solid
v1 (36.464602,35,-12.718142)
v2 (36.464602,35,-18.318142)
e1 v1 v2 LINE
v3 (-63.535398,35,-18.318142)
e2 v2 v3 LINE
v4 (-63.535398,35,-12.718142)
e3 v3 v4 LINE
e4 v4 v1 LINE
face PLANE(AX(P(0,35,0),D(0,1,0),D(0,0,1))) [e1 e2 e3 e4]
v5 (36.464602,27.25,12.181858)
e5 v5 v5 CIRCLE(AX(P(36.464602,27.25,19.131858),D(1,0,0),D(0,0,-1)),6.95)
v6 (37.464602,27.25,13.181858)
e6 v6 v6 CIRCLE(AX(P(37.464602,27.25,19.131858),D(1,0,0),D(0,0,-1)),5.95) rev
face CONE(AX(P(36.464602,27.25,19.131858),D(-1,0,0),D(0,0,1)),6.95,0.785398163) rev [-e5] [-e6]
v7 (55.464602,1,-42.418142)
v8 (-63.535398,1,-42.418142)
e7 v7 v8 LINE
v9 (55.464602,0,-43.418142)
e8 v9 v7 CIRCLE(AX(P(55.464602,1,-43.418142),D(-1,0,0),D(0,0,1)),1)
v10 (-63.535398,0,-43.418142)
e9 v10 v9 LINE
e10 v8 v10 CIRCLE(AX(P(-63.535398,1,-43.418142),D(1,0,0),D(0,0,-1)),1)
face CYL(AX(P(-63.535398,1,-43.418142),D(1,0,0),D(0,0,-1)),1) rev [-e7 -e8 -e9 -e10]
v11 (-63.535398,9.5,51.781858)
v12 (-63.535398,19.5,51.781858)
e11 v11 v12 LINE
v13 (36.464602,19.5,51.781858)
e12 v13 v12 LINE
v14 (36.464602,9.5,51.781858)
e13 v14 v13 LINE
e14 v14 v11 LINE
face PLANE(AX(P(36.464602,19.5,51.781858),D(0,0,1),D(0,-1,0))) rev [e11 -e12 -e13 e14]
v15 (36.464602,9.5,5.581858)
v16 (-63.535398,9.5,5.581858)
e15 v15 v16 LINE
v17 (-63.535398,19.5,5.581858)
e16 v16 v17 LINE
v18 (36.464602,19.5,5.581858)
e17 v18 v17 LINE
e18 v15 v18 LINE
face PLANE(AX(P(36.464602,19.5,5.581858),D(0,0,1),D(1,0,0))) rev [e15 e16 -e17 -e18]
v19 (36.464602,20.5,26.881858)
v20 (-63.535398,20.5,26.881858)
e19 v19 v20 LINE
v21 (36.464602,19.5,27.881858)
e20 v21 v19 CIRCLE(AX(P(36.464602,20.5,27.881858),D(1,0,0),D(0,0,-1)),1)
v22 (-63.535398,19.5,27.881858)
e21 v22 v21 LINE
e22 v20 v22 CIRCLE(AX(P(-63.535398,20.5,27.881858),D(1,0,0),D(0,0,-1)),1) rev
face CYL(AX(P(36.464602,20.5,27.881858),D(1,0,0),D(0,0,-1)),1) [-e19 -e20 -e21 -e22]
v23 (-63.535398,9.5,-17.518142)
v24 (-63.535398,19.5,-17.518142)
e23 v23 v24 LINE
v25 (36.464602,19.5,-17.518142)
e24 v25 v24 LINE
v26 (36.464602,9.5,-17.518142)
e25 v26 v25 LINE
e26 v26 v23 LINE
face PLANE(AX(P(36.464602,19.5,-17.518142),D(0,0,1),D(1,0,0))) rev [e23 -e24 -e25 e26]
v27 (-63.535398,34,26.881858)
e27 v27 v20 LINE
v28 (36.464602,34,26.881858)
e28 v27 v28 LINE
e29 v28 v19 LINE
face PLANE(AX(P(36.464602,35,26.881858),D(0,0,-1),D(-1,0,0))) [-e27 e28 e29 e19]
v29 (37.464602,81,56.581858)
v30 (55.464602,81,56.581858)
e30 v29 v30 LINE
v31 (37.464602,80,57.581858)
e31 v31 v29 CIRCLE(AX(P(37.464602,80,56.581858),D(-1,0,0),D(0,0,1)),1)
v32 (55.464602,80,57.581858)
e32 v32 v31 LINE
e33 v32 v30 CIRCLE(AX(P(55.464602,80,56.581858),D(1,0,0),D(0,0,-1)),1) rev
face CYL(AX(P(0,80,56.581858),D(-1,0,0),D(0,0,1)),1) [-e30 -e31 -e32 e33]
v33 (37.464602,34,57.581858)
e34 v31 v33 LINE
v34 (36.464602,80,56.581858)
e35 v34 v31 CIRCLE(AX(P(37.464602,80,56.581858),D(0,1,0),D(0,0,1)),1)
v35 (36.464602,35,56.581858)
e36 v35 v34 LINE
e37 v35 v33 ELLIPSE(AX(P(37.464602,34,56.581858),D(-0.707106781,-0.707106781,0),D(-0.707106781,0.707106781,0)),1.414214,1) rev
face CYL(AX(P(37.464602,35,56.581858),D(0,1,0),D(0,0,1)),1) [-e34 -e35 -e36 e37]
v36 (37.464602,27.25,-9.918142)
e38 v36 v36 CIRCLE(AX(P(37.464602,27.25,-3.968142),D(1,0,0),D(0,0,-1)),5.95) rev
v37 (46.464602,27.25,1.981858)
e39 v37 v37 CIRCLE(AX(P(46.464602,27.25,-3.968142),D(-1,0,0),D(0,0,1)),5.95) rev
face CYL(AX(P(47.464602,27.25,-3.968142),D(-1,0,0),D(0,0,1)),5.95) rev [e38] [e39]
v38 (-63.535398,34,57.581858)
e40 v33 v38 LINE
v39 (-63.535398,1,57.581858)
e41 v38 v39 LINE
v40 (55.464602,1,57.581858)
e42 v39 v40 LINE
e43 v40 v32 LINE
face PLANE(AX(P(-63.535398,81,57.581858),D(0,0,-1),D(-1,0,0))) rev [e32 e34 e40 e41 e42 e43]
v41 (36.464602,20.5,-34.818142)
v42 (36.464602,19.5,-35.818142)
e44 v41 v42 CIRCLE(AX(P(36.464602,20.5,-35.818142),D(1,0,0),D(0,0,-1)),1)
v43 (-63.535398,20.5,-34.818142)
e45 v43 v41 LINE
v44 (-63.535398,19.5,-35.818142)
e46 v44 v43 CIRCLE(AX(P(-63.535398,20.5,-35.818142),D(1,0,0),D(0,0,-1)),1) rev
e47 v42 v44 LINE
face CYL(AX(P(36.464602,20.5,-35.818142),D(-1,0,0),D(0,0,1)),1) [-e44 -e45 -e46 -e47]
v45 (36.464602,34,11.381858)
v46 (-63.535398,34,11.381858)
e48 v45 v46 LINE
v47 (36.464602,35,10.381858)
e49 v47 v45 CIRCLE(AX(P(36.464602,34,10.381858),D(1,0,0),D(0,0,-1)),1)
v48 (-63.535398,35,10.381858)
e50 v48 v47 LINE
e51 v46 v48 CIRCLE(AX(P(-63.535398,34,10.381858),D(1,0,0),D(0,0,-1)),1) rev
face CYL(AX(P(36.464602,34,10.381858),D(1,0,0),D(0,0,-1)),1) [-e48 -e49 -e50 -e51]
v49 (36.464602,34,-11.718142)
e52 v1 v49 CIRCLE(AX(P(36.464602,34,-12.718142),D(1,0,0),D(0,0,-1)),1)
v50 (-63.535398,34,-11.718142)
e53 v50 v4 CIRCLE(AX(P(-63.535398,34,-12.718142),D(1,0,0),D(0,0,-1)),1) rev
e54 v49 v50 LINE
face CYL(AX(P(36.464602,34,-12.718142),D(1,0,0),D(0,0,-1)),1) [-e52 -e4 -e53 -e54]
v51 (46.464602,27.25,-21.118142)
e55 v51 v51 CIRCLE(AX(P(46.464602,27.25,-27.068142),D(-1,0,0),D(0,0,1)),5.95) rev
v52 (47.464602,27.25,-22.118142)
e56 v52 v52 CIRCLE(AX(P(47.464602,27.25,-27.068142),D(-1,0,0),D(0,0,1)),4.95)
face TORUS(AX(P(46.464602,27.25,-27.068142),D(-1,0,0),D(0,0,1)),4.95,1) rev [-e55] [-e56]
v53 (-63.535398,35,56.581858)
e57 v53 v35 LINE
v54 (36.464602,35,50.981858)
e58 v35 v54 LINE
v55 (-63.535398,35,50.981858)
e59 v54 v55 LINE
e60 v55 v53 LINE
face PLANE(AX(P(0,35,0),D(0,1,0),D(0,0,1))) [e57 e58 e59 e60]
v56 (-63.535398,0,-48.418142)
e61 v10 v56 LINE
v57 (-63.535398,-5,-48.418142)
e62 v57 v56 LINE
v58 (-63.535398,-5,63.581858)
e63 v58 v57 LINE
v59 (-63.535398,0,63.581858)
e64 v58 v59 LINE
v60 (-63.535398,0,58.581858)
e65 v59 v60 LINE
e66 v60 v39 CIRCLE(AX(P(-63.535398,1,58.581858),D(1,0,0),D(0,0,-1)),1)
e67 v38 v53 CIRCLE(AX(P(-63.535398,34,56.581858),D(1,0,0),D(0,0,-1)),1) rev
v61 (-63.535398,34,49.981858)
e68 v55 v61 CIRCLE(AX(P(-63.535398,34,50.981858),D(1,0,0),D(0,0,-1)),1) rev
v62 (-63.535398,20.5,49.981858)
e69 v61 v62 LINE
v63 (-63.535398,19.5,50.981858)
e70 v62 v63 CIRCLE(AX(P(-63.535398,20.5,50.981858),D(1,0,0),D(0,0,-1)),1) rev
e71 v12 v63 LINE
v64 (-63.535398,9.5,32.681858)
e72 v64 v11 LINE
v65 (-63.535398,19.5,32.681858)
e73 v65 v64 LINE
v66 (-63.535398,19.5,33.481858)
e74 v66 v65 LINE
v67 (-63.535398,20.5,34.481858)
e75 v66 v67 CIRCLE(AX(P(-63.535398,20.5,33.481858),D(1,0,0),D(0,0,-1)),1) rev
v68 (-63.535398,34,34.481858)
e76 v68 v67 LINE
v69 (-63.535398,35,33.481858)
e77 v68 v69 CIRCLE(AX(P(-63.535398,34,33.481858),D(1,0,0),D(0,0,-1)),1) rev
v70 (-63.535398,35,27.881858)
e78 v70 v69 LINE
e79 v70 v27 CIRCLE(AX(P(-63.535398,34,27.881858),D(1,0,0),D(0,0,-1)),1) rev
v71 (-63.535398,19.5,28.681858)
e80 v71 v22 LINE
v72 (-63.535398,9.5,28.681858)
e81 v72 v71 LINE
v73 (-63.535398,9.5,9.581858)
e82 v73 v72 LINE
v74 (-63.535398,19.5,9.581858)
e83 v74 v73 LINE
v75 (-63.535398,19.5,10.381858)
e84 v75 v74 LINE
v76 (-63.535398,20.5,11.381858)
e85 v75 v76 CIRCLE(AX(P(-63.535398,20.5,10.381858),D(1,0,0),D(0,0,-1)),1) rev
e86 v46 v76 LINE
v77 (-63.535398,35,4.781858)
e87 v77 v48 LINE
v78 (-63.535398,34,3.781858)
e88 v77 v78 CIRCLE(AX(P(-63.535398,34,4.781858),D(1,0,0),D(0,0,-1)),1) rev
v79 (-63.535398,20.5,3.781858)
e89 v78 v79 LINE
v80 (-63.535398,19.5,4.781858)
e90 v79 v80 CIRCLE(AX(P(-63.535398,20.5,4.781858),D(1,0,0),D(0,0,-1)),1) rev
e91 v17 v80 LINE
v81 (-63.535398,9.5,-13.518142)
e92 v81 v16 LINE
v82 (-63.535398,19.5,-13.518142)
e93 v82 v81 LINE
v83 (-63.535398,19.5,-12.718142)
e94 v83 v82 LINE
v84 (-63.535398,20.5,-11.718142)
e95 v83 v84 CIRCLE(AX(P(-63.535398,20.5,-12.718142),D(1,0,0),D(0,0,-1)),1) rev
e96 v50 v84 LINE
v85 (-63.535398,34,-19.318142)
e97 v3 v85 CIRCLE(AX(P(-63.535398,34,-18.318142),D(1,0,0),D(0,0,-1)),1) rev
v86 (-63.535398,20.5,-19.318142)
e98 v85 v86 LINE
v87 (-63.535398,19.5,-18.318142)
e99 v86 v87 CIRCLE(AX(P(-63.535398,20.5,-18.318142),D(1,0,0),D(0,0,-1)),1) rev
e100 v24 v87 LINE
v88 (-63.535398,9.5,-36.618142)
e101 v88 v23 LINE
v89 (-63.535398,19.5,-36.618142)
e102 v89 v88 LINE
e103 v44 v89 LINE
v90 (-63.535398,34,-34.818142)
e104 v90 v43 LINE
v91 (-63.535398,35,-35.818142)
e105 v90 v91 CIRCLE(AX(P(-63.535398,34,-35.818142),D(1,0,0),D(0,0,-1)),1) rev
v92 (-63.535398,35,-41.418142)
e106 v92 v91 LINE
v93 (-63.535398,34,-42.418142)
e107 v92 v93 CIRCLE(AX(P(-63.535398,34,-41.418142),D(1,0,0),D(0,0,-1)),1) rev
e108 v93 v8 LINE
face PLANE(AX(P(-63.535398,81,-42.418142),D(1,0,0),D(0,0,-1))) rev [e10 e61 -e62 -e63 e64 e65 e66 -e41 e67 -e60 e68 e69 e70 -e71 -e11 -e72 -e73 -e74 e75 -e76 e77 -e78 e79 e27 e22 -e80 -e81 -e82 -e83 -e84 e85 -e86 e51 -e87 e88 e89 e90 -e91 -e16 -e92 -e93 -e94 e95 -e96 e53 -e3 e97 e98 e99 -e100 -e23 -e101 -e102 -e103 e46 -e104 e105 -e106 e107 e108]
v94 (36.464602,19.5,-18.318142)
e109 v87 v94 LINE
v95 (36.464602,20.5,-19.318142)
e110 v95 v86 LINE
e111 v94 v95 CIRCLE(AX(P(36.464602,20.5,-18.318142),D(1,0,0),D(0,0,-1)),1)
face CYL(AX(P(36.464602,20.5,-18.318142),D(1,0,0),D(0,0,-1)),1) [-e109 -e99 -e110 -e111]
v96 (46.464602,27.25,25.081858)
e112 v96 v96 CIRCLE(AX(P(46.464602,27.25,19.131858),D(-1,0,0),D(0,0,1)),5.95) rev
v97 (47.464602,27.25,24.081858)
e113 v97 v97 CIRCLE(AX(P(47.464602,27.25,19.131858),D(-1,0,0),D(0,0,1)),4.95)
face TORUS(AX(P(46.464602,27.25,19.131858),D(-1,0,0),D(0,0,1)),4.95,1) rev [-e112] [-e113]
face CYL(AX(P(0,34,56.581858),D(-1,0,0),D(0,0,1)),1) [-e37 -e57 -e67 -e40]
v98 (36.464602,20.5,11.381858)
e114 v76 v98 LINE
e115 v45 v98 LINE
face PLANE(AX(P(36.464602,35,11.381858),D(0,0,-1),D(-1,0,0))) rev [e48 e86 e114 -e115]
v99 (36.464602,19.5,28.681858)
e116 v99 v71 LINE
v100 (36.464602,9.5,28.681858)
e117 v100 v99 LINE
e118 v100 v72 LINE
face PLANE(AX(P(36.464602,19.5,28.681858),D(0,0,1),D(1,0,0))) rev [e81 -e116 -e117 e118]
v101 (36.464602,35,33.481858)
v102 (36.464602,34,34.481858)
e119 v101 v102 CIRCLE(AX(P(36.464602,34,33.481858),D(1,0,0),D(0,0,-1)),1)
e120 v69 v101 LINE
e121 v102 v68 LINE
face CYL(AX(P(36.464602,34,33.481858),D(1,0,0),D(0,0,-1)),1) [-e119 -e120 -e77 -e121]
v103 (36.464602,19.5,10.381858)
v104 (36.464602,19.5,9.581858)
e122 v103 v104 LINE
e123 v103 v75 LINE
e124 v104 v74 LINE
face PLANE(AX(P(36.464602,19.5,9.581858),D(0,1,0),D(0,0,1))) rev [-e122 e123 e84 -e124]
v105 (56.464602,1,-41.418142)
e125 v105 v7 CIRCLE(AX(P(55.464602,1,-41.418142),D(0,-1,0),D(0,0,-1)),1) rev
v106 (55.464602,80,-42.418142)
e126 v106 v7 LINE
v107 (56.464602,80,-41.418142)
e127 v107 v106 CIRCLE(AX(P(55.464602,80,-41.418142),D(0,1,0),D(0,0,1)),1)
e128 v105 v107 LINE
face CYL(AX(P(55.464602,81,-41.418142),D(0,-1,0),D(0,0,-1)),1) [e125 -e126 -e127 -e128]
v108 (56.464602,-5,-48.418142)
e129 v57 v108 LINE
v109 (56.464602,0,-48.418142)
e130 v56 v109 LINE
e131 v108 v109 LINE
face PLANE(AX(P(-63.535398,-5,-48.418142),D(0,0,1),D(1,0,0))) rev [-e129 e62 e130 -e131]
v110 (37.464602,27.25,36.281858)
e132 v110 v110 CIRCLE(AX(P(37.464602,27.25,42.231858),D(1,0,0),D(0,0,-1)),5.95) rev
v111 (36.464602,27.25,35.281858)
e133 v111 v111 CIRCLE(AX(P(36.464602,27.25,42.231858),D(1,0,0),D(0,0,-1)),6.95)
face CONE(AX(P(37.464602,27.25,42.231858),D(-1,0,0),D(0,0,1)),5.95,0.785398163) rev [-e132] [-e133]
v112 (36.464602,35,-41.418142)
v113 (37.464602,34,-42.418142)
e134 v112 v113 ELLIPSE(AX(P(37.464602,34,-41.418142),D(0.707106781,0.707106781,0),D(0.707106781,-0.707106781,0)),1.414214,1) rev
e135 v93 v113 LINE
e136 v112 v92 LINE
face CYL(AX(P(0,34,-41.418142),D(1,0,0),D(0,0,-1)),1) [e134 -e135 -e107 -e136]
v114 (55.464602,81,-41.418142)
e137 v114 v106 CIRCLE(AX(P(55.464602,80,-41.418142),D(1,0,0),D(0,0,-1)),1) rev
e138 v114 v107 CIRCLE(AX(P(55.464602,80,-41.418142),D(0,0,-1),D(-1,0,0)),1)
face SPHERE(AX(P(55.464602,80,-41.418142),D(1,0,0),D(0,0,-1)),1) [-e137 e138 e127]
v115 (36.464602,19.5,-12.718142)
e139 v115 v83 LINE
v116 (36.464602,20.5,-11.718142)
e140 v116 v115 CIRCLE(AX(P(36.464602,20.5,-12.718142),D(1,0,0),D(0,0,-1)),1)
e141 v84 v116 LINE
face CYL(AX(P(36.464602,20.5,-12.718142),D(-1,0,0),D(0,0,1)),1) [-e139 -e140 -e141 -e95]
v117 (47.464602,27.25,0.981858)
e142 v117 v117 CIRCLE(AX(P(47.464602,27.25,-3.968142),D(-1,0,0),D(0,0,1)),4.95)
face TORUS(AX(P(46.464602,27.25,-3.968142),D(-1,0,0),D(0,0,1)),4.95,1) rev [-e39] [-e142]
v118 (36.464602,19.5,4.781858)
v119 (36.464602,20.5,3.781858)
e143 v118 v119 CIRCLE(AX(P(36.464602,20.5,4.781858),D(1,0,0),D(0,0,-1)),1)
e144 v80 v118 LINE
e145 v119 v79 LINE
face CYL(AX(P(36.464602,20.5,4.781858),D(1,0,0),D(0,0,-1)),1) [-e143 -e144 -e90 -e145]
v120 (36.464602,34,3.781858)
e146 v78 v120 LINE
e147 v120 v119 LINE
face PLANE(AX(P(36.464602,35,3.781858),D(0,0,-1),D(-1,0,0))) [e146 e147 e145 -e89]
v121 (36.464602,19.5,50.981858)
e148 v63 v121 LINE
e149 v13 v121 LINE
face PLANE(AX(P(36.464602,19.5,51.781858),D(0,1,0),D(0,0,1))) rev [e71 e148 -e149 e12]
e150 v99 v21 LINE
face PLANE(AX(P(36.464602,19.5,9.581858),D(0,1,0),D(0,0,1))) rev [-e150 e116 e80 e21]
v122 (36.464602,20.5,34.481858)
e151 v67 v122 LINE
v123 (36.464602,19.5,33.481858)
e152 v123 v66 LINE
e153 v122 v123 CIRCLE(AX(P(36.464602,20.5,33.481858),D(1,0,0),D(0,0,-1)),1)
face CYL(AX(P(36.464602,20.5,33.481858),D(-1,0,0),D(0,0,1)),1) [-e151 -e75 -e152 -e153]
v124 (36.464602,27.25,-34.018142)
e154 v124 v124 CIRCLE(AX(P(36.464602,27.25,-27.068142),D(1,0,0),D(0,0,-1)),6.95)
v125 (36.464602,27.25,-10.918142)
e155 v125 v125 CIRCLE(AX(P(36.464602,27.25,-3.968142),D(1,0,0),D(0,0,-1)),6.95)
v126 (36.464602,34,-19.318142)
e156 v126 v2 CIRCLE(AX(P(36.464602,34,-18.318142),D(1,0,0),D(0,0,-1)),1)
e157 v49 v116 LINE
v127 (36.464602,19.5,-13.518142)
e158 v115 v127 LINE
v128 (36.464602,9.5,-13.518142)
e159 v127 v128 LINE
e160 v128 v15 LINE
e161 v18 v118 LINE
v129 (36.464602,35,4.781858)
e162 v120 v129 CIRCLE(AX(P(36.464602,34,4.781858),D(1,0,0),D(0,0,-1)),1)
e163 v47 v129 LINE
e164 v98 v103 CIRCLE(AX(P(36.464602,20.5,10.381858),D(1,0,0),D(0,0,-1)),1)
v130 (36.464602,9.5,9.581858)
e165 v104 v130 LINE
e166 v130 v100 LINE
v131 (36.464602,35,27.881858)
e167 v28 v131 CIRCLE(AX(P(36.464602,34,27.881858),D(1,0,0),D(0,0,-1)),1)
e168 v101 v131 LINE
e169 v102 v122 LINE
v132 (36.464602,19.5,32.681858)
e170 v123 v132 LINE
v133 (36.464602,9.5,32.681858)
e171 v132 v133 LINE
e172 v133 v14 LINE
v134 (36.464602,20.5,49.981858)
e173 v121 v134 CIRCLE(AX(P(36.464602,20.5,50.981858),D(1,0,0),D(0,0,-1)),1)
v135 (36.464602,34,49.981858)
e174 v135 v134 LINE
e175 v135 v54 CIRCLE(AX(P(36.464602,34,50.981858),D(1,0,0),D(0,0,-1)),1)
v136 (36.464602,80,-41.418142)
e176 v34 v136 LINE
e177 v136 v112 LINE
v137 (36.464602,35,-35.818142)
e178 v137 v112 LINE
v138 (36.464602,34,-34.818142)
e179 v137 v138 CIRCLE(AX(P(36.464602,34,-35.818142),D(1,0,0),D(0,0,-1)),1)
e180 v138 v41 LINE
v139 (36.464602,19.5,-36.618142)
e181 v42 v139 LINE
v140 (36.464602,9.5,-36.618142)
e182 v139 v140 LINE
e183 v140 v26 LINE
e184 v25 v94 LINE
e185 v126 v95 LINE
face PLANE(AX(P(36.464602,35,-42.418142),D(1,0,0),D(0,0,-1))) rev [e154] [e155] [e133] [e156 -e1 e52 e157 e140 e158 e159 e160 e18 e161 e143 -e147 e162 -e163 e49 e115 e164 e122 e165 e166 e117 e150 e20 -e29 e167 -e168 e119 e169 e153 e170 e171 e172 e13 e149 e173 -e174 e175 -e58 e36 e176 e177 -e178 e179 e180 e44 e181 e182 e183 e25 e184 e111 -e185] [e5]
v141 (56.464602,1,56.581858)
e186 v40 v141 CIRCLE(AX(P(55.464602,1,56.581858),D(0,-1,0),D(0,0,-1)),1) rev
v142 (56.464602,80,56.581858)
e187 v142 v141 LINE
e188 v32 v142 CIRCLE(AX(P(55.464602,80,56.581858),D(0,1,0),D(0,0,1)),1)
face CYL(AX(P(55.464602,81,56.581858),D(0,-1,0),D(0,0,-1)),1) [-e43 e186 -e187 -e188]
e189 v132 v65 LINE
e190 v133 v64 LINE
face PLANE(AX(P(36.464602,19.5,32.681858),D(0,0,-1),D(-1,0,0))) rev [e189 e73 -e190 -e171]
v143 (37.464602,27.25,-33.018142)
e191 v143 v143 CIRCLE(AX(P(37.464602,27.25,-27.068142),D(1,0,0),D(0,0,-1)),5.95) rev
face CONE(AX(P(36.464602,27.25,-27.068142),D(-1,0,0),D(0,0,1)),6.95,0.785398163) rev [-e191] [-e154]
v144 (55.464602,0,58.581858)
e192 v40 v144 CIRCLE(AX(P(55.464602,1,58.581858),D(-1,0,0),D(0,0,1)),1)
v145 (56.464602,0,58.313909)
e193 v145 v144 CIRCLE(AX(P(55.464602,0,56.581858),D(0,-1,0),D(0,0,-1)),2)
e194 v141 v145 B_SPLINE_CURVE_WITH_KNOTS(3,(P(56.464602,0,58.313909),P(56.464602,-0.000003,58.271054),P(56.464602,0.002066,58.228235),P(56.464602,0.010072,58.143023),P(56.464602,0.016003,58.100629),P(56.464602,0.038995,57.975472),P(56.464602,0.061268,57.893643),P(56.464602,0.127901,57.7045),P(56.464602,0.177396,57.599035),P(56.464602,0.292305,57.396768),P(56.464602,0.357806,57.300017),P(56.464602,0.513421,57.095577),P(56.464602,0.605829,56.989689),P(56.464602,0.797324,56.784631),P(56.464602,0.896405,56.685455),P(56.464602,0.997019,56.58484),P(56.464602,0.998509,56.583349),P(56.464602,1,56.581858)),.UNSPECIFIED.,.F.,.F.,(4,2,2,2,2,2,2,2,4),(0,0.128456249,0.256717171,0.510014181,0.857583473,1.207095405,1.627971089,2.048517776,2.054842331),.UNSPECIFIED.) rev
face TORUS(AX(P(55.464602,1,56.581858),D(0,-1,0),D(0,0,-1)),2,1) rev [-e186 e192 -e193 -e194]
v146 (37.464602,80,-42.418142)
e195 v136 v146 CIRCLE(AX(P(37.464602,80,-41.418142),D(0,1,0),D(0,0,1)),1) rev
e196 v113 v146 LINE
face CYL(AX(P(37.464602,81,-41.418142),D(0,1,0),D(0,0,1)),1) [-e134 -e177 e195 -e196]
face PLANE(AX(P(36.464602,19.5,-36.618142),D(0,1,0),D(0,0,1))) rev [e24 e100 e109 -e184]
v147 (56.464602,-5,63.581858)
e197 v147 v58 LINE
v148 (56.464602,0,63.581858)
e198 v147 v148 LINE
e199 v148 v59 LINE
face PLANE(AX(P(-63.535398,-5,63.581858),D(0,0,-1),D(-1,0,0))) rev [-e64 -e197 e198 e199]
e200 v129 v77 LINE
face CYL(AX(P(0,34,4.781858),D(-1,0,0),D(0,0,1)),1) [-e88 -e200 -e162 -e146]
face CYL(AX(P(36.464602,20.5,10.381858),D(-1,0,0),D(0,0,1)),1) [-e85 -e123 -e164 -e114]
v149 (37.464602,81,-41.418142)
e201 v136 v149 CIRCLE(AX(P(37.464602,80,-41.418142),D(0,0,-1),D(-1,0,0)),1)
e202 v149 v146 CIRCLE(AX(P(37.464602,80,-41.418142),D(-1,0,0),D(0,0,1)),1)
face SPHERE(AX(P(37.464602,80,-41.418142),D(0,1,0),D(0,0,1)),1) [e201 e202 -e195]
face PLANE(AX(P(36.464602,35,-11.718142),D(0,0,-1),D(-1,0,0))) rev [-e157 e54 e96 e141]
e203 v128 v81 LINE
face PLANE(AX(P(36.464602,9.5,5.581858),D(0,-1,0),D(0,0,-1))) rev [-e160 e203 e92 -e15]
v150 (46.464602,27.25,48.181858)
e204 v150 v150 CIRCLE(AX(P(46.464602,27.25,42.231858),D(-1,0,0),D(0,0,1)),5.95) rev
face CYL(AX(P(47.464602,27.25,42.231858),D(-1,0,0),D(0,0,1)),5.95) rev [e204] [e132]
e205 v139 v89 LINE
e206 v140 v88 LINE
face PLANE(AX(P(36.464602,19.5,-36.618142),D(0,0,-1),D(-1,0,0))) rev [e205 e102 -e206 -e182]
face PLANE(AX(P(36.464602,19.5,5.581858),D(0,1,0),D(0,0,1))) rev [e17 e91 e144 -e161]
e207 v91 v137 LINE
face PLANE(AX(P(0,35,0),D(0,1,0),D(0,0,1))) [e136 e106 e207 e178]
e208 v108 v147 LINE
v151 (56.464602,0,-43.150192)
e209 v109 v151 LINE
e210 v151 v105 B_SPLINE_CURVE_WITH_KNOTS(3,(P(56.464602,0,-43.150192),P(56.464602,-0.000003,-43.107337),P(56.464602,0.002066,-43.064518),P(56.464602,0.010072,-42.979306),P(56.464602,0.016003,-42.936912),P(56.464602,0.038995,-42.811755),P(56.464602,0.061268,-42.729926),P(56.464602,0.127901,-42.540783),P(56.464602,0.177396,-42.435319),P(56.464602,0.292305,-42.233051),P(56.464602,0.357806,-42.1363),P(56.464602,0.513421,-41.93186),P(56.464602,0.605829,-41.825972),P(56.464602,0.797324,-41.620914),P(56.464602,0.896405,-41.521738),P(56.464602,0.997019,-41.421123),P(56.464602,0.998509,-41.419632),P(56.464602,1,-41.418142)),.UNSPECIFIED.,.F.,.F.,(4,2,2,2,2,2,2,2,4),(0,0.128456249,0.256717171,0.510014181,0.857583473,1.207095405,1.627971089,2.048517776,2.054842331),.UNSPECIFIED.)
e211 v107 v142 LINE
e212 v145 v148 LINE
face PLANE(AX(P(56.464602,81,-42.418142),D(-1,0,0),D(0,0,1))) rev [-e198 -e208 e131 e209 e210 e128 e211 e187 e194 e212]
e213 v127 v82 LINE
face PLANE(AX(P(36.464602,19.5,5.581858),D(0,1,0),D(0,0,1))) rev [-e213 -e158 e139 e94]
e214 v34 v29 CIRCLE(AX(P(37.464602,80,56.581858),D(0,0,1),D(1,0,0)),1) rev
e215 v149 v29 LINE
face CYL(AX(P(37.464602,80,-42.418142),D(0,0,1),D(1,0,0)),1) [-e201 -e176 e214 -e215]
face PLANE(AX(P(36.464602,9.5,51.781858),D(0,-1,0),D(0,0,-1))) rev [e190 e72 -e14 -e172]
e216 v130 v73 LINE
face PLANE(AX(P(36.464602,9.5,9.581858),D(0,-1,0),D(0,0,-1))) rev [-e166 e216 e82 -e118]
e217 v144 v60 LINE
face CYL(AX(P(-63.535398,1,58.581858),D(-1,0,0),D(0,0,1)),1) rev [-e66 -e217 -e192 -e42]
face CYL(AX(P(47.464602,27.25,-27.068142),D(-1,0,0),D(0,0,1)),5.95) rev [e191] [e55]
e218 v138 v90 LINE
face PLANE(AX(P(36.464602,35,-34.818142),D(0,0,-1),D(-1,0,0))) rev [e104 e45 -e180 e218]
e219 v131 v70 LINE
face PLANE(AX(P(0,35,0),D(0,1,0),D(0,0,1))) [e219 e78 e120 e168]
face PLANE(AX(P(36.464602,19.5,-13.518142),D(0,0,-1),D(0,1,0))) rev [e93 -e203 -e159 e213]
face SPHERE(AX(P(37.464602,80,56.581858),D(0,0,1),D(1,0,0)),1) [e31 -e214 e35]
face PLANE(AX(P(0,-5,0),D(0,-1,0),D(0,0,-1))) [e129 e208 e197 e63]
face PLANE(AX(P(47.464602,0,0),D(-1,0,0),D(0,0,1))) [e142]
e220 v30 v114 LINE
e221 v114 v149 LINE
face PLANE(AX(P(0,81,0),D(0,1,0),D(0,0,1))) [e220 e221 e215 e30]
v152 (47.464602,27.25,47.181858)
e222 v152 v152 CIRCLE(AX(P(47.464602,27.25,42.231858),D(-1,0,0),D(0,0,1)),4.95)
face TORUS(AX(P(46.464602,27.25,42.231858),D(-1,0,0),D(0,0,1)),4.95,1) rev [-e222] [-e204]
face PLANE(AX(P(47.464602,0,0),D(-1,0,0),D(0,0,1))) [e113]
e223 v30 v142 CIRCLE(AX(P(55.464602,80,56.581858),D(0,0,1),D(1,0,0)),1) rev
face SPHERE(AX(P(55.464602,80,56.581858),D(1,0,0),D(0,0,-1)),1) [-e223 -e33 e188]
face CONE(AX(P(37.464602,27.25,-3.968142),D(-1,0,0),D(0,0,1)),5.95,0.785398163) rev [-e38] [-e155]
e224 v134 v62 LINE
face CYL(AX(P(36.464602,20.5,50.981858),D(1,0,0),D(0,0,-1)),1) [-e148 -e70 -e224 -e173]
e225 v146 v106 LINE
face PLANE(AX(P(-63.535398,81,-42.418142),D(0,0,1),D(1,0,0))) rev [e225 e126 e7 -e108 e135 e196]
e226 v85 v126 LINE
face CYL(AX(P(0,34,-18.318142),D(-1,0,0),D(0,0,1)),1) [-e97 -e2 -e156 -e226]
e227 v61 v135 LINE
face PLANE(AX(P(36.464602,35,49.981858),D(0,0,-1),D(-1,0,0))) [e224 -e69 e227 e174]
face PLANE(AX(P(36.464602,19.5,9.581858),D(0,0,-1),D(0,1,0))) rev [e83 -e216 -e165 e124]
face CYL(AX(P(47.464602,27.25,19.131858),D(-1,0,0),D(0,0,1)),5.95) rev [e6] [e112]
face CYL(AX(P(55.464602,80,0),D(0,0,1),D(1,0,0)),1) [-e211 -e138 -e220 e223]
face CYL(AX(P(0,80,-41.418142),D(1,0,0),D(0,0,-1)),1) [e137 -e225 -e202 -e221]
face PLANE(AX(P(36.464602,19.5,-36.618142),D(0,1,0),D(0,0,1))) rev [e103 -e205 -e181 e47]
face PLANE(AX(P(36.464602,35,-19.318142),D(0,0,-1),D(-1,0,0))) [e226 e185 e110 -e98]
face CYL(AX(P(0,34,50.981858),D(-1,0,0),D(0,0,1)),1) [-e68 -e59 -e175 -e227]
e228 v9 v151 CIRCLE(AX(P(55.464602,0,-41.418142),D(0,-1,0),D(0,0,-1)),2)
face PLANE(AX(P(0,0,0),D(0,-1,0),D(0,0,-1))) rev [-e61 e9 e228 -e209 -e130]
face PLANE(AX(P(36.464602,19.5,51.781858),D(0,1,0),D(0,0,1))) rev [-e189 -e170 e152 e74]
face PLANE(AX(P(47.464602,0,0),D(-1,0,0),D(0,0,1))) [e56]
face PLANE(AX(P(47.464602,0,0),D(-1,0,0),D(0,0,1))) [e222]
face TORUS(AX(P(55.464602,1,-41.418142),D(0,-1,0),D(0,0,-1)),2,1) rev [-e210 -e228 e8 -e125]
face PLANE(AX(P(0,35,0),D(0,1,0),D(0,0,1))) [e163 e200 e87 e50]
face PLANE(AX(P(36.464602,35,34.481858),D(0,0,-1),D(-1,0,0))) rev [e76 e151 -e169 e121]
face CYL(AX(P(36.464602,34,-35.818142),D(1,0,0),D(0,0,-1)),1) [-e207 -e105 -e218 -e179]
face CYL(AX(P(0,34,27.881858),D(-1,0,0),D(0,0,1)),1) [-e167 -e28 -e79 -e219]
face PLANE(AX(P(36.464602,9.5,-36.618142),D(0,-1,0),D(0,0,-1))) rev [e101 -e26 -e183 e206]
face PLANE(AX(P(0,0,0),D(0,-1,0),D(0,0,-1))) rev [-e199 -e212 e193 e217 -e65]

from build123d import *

# Parameters (mm, degrees)
SKETCH1_W           = 120
SKETCH1_H           = 100
BOSS_EXTRUDE1_DEPTH = 81
SKETCH2_W           = 100
SKETCH2_H           = 100
CUT_EXTRUDE1_DEPTH  = 46
SKETCH6_W           = 15.5
SKETCH6_H           = 15.5
CUT_EXTRUDE4_DEPTH  = 100
SKETCH8_W           = 19.1
SKETCH8_H           = 10
CUT_EXTRUDE5_DEPTH  = 100
SKETCH6_3_R         = 5.95
CUT_EXTRUDE6_DEPTH  = 111
FILLET1_R           = 1
CHAMFER1_SIZE       = 1
FILLET2_R           = 1
FILLET3_R           = 1
SKETCH9_W           = 120
SKETCH9_H           = 112
BOSS_EXTRUDE2_DEPTH = 5
FILLET4_R           = 1


with BuildPart() as part:
    # Sketch1 → Boss-Extrude1 (new body)
    with BuildSketch(Plane(origin=(0, 0, 0), x_dir=(1, 0, 0), z_dir=(0, 1, 0))):
        with Locations((-3.53539823, -7.581858407)):
            Rectangle(SKETCH1_W, SKETCH1_H)
    extrude(amount=BOSS_EXTRUDE1_DEPTH)

    # Sketch2 → Cut-Extrude1 (cut)
    with BuildSketch(Plane(origin=(0, 81, 0), x_dir=(1, 0, 0), z_dir=(0, 1, 0))):
        with Locations((-13.53539823, -7.581858407)):
            Rectangle(SKETCH2_W, SKETCH2_H)
    extrude(amount=-CUT_EXTRUDE1_DEPTH, mode=Mode.SUBTRACT)

    # Sketch6 → Cut-Extrude4 (cut)
    with BuildSketch(Plane.ZY.offset(63.53539823)):
        with Locations((-27.068141593, 27.25)):
            Rectangle(SKETCH6_W, SKETCH6_H)
        with Locations((-3.968141593, 27.25)):
            Rectangle(SKETCH6_W, SKETCH6_H)
        with Locations((19.131858407, 27.25)):
            Rectangle(SKETCH6_W, SKETCH6_H)
        with Locations((42.231858407, 27.25)):
            Rectangle(SKETCH6_W, SKETCH6_H)
    extrude(amount=-CUT_EXTRUDE4_DEPTH, mode=Mode.SUBTRACT)

    # Sketch8 → Cut-Extrude5 (cut)
    with BuildSketch(Plane.ZY.offset(63.53539823)):
        with Locations((-27.068141593, 14.5)):
            Rectangle(SKETCH8_W, SKETCH8_H)
        with Locations((-3.968141593, 14.5)):
            Rectangle(SKETCH8_W, SKETCH8_H)
        with Locations((42.231858407, 14.5)):
            Rectangle(SKETCH8_W, SKETCH8_H)
        with Locations((19.131858407, 14.5)):
            Rectangle(SKETCH8_W, SKETCH8_H)
    extrude(amount=-CUT_EXTRUDE5_DEPTH, mode=Mode.SUBTRACT)

    # Sketch6<3> → Cut-Extrude6 (cut)
    with BuildSketch(Plane.ZY.offset(63.53539823)):
        with Locations((-27.068141593, 27.25)):
            Circle(SKETCH6_3_R)
        with Locations((-3.968141593, 27.25)):
            Circle(SKETCH6_3_R)
        with Locations((42.231858407, 27.25)):
            Circle(SKETCH6_3_R)
        with Locations((19.131858407, 27.25)):
            Circle(SKETCH6_3_R)
    extrude(amount=-CUT_EXTRUDE6_DEPTH, mode=Mode.SUBTRACT)

    # Fillet1
    fillet1_edges = [part.edges().sort_by_distance(p)[0] for p in [
        (56.46460177, 81, 7.581858407),
        (46.46460177, 81, 57.581858407),
        (46.46460177, 81, -42.418141593),
        (-13.53539823, 35, -42.418141593),
        (36.46460177, 58, -42.418141593),
        (-13.53539823, 35, 57.581858407),
        (36.46460177, 58, 57.581858407),
        (36.46460177, 81, 7.581858407),
        (56.46460177, 40.5, -42.418141593),
        (56.46460177, 40.5, 57.581858407),
    ]]
    fillet(fillet1_edges, radius=FILLET1_R)

    # Chamfer1
    chamfer1_edges = [part.edges().sort_by_distance(p)[0] for p in [
        (36.46460177, 27.25, -33.018141593),
        (36.46460177, 27.25, -9.918141593),
        (36.46460177, 27.25, 13.181858407),
        (36.46460177, 27.25, 36.281858407),
    ]]
    chamfer(chamfer1_edges, length=CHAMFER1_SIZE)

    # Fillet2
    fillet2_edges = [part.edges().sort_by_distance(p)[0] for p in [
        (47.46460177, 27.25, -33.018141593),
        (47.46460177, 27.25, -9.918141593),
        (47.46460177, 27.25, 13.181858407),
        (47.46460177, 27.25, 36.281858407),
    ]]
    fillet(fillet2_edges, radius=FILLET2_R)

    # Fillet3
    fillet3_edges = [part.edges().sort_by_distance(p)[0] for p in [
        (-13.53539823, 19.5, -19.318141593),
        (-13.53539823, 19.5, -34.818141593),
        (-13.53539823, 35, -34.818141593),
        (-13.53539823, 35, -19.318141593),
        (-13.53539823, 19.5, 3.781858407),
        (-13.53539823, 19.5, -11.718141593),
        (-13.53539823, 35, -11.718141593),
        (-13.53539823, 35, 3.781858407),
        (-13.53539823, 19.5, 49.981858407),
        (-13.53539823, 19.5, 34.481858407),
        (-13.53539823, 35, 34.481858407),
        (-13.53539823, 35, 49.981858407),
        (-13.53539823, 19.5, 26.881858407),
        (-13.53539823, 19.5, 11.381858407),
        (-13.53539823, 35, 11.381858407),
        (-13.53539823, 35, 26.881858407),
    ]]
    fillet(fillet3_edges, radius=FILLET3_R)

    # Sketch9 → Boss-Extrude2 (add)
    with BuildSketch(Plane.XZ):
        with Locations((-3.53539823, 7.581858407)):
            Rectangle(SKETCH9_W, SKETCH9_H)
    extrude(amount=BOSS_EXTRUDE2_DEPTH)

    # Fillet4
    # the kernel refuses this fillet: 1 mm, written as the material it adds along each edge
    with BuildSketch(Plane(origin=(-63.53539823, 0, -42.418141593), x_dir=(0, 0, -1), z_dir=(1, 0, 0)), Plane(origin=(55.46460177, 0, 57.581858407), x_dir=(0, 0, 1), z_dir=(-1, 0, 0))) as fillet4_piece_1:
        with BuildLine():
            CenterArc((FILLET4_R, FILLET4_R), FILLET4_R, 180, 90)
            Line((0, FILLET4_R), (0, 0))
            Line((0, 0), (FILLET4_R, 0))
        make_face()
    extrude(amount=119)
    with BuildSketch(Plane(origin=(55.46460177, 0, -41.418141593), x_dir=(0, 0, -1), z_dir=(-1, 0, 0))) as fillet4_piece_2_section:
        with BuildLine():
            CenterArc((1 + FILLET4_R, -FILLET4_R), FILLET4_R, 90, 90)
            Line((1, -FILLET4_R), (1, 0))
            Line((1, 0), (1 + FILLET4_R, 0))
        make_face()
    fillet4_piece_2 = revolve(axis=Axis((55.46460177, 0, -41.418141593), (0, -1, 0)), revolution_arc=233.296989237, mode=Mode.PRIVATE)
    fillet4_piece_2 = split(fillet4_piece_2, bisect_by=Plane(origin=(56.46460177, 0.167300205, -42.63791684), z_dir=(-1, 0, 0)), keep=Keep.TOP, mode=Mode.PRIVATE)
    add(fillet4_piece_2)
    with BuildSketch(Plane(origin=(55.46460177, 0, 56.581858407), x_dir=(-0.8017442392976468, 0, -0.5976672776328293), z_dir=(-0.5976672776328293, 0, 0.8017442392976468))) as fillet4_piece_3_section:
        with BuildLine():
            CenterArc((1 + FILLET4_R, -FILLET4_R), FILLET4_R, 90, 90)
            Line((1, -FILLET4_R), (1, 0))
            Line((1, 0), (1 + FILLET4_R, 0))
        make_face()
    fillet4_piece_3 = revolve(axis=Axis((55.46460177, 0, 56.581858407), (0, -1, 0)), revolution_arc=233.296989237, mode=Mode.PRIVATE)
    fillet4_piece_3 = split(fillet4_piece_3, bisect_by=Plane(origin=(56.46460177, 0.311628743, 57.33179725), z_dir=(-1, 0, 0)), keep=Keep.TOP, mode=Mode.PRIVATE)
    add(fillet4_piece_3)


solid = part.part
